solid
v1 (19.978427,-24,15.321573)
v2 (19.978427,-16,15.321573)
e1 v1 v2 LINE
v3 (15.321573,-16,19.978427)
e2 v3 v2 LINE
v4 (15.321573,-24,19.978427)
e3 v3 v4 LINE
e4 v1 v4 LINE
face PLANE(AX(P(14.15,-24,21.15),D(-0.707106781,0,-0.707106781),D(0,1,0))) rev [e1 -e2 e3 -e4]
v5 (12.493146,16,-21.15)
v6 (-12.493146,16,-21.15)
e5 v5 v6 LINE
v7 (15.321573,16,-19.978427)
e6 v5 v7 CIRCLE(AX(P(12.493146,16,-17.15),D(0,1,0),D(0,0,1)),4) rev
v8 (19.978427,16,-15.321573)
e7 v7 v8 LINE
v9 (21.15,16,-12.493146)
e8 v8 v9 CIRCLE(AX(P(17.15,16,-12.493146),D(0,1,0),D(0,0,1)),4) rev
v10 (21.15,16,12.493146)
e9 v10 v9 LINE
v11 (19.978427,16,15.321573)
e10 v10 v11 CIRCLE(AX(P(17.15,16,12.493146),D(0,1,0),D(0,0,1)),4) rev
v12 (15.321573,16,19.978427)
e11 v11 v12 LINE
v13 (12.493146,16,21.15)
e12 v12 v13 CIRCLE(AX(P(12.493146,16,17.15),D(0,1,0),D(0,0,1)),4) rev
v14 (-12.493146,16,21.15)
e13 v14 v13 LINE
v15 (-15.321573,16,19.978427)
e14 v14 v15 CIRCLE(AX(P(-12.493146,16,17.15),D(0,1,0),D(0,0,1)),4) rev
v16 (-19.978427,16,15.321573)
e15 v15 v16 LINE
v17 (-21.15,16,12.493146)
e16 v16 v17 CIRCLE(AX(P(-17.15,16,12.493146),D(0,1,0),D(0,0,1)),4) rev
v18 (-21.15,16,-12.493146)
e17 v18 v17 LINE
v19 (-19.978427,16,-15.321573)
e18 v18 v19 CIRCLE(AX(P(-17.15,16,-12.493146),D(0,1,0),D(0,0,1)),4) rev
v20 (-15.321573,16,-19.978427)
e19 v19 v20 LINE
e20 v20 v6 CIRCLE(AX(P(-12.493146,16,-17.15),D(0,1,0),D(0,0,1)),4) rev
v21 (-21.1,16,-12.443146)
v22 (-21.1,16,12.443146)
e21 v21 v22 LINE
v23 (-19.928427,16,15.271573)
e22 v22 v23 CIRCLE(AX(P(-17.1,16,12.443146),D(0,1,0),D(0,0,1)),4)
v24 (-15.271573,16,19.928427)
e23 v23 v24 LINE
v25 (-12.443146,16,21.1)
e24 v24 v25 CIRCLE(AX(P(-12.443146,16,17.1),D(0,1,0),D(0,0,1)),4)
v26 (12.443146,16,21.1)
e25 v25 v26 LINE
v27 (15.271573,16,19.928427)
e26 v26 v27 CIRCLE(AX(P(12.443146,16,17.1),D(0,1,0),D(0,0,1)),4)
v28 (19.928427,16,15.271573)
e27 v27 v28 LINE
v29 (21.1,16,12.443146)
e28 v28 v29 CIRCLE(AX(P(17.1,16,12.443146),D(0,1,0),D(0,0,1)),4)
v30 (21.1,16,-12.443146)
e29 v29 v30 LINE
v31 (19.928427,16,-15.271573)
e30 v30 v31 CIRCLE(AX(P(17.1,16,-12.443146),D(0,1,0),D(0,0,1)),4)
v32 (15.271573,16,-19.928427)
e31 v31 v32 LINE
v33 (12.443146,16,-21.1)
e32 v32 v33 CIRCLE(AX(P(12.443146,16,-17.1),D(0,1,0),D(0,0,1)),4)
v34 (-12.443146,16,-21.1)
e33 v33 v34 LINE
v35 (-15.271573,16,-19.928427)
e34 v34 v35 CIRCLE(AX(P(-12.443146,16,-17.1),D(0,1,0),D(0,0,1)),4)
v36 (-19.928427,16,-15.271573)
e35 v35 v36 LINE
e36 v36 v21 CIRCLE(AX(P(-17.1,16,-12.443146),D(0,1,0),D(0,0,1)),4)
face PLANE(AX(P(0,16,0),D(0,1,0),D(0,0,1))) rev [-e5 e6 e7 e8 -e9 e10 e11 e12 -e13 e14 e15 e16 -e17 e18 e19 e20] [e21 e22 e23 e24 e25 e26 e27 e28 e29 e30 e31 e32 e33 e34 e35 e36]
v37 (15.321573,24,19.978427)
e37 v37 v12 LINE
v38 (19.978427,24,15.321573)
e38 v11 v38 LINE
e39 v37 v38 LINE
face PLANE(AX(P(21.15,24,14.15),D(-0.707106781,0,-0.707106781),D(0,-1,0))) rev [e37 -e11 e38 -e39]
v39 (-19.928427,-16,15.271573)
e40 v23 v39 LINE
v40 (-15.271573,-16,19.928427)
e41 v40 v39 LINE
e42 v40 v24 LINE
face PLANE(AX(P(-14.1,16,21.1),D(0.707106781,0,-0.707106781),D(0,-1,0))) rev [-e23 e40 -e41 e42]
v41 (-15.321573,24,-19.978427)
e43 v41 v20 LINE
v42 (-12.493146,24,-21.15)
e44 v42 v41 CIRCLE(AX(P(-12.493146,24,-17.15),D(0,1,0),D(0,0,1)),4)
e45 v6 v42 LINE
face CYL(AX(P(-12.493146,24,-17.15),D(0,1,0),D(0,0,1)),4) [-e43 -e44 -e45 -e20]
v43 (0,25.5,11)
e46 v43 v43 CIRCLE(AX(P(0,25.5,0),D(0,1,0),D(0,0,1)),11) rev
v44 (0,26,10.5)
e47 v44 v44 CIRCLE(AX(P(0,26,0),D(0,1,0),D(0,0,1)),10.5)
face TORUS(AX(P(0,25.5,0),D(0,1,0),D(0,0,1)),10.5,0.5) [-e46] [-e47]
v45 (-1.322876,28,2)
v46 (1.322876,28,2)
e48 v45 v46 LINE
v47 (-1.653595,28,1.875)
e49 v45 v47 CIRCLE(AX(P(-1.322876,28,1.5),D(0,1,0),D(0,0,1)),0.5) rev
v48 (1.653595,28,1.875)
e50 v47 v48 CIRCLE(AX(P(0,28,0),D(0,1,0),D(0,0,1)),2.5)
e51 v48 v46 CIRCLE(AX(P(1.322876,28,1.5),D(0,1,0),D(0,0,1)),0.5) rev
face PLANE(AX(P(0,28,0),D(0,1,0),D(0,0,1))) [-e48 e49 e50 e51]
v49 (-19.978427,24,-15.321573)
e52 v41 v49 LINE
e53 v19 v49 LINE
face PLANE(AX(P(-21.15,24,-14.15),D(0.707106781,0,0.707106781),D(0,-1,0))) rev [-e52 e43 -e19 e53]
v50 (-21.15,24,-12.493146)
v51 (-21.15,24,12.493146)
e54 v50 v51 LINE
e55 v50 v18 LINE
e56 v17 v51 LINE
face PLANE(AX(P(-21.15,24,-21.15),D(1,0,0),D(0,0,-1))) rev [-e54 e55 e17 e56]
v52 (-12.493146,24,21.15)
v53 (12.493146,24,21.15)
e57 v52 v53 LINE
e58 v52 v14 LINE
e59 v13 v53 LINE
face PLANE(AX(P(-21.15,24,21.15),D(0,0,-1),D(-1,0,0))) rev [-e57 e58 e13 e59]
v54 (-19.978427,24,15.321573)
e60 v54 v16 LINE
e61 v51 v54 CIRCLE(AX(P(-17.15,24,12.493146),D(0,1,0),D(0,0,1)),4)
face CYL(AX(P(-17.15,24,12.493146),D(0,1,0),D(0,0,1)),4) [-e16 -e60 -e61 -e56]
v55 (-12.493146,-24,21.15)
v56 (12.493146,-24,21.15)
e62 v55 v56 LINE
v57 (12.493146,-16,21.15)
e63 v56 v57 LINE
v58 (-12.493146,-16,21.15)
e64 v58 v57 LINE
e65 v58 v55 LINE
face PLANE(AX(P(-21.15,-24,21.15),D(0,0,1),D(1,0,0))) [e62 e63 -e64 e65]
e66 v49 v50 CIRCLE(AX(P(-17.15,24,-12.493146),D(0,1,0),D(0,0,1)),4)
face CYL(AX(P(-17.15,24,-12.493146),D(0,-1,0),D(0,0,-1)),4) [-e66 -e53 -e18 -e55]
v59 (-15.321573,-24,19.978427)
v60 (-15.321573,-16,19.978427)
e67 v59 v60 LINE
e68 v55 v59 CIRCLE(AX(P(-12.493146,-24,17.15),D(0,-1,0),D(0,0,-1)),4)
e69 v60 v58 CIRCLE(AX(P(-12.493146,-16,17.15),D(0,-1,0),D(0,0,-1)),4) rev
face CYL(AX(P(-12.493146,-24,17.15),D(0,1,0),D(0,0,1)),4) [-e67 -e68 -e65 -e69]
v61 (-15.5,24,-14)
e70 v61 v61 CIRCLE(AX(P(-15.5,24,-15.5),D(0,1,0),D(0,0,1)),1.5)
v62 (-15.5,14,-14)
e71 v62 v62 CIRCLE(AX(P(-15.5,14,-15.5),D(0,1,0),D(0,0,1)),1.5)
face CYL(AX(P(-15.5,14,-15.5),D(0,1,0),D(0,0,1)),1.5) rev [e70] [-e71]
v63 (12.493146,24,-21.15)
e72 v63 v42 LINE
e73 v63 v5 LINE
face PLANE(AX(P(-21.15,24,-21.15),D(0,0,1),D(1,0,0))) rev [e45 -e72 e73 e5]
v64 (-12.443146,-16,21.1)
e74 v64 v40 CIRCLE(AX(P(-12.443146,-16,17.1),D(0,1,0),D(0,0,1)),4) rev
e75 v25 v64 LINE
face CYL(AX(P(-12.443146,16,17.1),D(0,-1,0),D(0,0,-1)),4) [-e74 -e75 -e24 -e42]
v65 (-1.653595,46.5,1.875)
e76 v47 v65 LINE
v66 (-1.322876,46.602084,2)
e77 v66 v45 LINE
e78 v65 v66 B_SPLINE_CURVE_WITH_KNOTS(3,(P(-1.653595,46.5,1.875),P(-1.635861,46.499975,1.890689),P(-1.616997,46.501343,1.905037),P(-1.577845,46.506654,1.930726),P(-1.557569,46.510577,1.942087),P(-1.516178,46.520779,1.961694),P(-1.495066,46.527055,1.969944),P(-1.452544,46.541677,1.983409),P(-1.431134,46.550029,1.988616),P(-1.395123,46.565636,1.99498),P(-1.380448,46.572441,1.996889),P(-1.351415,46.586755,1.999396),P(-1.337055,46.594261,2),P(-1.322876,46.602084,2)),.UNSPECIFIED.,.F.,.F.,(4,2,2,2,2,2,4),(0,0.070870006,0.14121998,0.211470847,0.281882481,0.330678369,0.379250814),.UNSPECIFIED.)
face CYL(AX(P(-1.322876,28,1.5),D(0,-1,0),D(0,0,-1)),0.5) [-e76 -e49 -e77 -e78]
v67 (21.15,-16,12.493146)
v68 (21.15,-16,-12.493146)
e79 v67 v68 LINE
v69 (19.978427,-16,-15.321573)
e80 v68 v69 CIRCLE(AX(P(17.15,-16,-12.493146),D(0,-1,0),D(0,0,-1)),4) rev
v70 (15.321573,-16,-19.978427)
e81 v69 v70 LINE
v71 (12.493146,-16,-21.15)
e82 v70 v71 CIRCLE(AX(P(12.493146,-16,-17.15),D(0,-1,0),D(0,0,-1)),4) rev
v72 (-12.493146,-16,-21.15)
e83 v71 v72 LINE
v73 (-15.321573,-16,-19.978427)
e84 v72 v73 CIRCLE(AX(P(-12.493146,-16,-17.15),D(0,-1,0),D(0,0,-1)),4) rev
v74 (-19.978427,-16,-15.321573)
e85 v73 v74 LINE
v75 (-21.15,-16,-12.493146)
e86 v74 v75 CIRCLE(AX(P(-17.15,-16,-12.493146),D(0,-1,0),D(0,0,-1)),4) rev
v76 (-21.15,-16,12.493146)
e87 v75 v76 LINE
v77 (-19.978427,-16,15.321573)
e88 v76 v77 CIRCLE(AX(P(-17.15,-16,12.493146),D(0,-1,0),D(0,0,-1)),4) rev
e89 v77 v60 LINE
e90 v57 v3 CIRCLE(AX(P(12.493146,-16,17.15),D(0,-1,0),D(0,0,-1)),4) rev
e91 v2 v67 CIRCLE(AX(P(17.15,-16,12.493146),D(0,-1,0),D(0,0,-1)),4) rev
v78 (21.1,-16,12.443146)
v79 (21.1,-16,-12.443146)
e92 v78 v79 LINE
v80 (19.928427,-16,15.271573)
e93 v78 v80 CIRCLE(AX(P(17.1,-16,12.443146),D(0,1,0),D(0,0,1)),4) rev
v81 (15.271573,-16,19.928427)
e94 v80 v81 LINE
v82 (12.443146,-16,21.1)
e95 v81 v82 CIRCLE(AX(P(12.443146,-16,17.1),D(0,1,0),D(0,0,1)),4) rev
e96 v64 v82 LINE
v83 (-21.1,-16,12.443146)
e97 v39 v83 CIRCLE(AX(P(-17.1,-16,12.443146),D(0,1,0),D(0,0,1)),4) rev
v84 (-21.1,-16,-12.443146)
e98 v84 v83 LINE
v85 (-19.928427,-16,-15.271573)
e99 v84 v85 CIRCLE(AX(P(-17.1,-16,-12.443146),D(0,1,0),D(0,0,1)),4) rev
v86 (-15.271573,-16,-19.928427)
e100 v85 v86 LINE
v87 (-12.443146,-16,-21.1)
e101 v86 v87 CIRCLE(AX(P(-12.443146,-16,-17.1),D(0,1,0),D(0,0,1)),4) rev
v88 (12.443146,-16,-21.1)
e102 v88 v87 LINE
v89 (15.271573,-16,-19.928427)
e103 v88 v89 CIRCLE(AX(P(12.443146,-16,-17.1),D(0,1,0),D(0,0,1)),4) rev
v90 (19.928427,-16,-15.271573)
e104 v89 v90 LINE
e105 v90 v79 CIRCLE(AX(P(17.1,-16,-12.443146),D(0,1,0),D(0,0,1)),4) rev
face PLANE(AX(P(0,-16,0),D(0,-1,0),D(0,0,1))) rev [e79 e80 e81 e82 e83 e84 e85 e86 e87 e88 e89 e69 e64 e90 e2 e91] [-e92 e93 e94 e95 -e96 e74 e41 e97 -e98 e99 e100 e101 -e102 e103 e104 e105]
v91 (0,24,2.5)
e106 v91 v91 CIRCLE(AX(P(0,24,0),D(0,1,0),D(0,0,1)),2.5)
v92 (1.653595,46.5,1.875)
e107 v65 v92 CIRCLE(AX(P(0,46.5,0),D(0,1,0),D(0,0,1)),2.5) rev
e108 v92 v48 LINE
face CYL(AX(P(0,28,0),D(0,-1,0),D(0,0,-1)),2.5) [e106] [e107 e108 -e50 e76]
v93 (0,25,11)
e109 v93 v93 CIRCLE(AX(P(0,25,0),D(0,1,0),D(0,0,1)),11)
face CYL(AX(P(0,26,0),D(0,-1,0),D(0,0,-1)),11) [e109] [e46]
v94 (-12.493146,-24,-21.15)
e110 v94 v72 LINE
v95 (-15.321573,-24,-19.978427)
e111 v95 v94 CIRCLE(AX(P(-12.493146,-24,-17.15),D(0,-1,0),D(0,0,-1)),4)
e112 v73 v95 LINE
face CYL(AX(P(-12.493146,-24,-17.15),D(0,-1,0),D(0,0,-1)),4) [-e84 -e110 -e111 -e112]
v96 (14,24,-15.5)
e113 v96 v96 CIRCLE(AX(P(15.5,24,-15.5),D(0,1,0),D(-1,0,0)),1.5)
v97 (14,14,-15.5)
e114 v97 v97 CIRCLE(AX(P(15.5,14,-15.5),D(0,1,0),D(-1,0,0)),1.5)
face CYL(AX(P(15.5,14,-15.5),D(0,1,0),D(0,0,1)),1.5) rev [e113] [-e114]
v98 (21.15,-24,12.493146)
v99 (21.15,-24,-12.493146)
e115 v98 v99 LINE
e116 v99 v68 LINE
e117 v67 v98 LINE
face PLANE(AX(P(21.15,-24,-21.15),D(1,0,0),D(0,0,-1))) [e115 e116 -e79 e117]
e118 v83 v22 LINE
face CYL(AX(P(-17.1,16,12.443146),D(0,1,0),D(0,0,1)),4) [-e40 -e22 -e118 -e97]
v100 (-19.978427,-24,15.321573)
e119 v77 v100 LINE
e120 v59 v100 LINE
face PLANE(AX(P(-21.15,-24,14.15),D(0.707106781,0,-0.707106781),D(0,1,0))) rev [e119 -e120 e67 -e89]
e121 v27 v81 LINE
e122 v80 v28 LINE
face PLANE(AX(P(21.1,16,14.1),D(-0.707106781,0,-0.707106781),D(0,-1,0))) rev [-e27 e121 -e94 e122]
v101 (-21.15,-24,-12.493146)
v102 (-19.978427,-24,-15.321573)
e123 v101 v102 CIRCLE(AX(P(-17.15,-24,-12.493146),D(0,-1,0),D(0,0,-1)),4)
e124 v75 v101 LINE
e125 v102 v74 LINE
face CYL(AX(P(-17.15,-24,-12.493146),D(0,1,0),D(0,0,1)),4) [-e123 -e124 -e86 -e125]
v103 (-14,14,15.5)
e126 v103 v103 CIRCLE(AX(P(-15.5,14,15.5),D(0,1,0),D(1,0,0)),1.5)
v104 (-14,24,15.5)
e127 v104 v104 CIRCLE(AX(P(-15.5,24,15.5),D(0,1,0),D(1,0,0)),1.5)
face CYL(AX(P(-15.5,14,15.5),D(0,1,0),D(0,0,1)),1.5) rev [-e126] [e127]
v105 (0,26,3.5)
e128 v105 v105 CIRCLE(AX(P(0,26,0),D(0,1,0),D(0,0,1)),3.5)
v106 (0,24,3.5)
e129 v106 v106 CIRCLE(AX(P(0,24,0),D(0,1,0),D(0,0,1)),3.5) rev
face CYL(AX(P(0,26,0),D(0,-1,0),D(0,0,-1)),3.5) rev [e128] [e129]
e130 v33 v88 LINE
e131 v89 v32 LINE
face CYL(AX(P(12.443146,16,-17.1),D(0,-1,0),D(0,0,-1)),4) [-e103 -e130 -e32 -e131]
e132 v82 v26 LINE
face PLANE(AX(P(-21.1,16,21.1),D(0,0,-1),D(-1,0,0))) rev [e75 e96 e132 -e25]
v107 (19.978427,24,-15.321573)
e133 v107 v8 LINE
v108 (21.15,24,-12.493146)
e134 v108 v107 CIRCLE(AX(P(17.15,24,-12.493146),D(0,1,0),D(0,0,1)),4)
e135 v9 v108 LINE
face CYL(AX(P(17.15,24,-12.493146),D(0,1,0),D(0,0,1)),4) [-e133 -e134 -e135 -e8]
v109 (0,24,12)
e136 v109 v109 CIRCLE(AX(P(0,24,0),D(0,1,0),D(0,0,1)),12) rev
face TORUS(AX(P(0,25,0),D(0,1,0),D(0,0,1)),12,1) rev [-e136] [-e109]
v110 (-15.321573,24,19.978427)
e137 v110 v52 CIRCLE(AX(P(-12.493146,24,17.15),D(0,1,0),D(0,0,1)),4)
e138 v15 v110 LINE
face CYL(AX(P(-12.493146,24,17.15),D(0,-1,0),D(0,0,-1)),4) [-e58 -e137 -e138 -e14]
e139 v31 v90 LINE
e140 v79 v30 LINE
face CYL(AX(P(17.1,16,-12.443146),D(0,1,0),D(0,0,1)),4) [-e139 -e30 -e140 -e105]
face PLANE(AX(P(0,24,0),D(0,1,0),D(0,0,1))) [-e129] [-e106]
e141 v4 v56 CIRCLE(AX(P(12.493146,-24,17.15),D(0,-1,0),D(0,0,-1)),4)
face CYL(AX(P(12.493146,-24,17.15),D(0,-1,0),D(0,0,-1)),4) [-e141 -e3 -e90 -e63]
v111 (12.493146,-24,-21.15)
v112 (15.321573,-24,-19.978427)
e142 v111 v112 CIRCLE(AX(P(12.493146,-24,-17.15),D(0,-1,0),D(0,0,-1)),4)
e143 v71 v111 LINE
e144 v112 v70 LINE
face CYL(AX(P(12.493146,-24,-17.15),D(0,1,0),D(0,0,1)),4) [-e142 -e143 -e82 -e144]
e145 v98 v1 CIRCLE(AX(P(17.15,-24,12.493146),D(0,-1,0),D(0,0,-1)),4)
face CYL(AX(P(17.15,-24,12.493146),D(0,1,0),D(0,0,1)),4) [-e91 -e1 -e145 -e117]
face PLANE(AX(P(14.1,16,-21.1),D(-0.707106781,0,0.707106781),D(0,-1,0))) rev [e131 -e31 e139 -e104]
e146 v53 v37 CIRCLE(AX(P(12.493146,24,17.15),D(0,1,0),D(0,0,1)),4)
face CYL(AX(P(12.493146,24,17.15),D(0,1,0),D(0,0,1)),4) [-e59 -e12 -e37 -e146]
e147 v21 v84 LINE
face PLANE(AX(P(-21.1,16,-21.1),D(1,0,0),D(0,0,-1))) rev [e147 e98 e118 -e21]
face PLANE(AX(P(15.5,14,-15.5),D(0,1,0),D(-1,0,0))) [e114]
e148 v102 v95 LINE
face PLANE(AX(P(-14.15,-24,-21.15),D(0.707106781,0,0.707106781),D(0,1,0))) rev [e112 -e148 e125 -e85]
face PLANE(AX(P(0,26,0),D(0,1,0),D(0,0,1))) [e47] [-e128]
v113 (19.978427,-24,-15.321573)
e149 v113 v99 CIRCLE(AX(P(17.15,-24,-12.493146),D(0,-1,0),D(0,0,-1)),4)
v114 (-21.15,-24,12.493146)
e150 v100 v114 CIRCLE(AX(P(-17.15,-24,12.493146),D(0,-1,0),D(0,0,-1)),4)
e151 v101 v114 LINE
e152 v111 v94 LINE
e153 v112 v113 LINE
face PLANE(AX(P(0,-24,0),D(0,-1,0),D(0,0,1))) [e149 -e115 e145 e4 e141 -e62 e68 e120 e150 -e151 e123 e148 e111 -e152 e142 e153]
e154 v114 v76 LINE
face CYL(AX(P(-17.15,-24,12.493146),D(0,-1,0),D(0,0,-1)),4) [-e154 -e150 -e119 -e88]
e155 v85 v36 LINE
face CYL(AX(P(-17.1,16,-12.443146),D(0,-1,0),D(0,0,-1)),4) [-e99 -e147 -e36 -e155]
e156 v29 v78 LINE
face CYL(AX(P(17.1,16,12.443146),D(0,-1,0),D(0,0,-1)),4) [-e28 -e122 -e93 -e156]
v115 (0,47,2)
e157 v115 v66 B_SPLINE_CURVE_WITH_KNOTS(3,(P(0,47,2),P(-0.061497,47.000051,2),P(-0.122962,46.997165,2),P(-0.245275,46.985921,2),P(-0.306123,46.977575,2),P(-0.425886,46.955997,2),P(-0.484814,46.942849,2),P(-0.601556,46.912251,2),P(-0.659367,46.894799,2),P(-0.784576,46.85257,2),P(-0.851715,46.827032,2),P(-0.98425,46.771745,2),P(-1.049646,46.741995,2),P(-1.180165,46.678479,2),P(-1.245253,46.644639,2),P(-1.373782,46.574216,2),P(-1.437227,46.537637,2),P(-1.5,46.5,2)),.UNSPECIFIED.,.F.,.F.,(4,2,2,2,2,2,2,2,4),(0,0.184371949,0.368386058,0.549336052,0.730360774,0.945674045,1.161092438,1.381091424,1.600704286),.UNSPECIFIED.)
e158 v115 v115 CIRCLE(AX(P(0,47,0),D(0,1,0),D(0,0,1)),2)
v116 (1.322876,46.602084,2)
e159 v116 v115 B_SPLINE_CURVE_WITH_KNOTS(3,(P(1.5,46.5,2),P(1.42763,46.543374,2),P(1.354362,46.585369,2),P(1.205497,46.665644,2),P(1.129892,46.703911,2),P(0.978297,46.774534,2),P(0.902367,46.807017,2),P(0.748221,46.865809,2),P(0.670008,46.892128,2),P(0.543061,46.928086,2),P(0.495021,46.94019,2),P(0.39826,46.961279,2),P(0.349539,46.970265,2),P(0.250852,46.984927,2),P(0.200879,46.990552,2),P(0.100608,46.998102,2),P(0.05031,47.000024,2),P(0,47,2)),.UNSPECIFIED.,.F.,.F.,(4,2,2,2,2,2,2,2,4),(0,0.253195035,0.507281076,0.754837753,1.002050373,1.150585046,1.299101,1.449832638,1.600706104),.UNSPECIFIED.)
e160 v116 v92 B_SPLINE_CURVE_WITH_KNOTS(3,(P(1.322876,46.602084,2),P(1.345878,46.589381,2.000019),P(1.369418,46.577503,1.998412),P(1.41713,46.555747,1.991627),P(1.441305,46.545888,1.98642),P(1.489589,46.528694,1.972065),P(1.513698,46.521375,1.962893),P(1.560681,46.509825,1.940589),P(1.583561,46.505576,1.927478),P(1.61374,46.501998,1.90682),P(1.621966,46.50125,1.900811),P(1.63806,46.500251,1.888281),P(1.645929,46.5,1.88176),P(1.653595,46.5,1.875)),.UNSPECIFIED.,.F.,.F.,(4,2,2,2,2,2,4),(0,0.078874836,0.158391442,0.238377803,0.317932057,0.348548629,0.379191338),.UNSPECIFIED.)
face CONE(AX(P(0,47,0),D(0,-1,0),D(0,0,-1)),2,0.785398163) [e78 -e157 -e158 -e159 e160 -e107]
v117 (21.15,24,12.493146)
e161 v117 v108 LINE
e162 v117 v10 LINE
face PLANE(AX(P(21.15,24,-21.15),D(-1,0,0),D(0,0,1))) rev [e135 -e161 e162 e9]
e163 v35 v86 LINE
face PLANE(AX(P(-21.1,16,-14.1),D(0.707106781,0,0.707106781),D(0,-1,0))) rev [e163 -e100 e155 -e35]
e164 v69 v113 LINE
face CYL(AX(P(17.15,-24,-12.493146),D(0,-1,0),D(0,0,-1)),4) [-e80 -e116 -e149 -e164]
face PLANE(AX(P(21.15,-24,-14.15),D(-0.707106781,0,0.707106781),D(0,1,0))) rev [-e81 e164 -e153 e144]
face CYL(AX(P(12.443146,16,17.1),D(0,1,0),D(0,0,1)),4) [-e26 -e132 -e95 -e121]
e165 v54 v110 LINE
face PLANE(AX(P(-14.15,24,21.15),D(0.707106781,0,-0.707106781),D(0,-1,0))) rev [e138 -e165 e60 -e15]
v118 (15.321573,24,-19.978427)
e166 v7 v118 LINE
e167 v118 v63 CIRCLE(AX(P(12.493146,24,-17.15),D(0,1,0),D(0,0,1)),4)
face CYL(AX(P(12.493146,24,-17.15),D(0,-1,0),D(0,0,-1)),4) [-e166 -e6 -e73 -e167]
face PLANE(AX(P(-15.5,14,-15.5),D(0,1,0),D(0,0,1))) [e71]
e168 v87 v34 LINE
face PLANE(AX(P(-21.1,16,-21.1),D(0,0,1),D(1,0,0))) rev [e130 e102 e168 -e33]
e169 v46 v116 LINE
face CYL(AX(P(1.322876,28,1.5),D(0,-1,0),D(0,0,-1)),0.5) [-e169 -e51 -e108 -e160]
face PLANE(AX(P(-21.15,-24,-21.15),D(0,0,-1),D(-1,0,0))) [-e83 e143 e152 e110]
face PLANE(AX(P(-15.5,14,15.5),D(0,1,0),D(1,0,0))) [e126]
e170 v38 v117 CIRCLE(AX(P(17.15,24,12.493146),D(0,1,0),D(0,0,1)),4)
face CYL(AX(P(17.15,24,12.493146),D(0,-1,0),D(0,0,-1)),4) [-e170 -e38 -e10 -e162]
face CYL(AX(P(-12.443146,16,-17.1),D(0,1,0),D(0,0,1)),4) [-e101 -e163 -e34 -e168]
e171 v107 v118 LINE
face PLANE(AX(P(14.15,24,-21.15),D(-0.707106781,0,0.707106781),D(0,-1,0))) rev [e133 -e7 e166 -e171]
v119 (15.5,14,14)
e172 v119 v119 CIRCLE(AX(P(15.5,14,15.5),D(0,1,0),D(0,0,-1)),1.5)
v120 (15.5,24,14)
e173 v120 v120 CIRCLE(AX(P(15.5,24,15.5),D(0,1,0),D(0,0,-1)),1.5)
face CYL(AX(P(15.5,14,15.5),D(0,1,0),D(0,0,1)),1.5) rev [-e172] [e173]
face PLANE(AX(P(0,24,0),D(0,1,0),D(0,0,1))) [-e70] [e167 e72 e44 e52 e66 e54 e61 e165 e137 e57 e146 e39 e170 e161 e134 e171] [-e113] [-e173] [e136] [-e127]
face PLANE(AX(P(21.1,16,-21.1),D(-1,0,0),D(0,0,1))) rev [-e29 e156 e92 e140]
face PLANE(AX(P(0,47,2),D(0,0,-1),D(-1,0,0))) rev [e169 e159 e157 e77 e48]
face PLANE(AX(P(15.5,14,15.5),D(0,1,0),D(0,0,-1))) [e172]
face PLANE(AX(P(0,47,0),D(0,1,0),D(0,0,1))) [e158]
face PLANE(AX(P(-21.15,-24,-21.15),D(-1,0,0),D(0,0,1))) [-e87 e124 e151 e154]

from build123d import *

# Parameters (mm, degrees)
ESBO_O1_W                  = 42.2
ESBO_O1_H                  = 42.2
RESSALTO_EXTRUS_O1_DEPTH   = 16
CHANFRO4_SIZE              = 7
FILETE3_R                  = 4
ESBO_O2_W                  = 42.3
ESBO_O2_H                  = 42.3
RESSALTO_EXTRUS_O2_DEPTH   = 8
CHANFRO5_SIZE              = 7
FILETE4_R                  = 4
CHANFRO5_OF_ESPELHAR1_SIZE = 7
FILETE4_OF_ESPELHAR1_R     = 4
ESBO_O3_R                  = 11
ESBO_O3_R_2                = 3.5
RESSALTO_EXTRUS_O3_DEPTH   = 2
FILETE5_R                  = 0.5
FILETE6_R                  = 1
ESBO_O4_R                  = 1.5
CORTE_EXTRUS_O1_DEPTH      = 10
PADR_OCIRCULAR1_COUNT      = 4
ESBO_O5_R                  = 2.5
RESSALTO_EXTRUS_O4_DEPTH   = 4
RESSALTO_EXTRUS_O5_DEPTH   = 19
CHANFRO3_SIZE              = 0.5
FILETE2_R                  = 0.5


with BuildPart() as part:
    # Esboço1 → Ressalto-extrusão1 (new, symmetric)
    with BuildSketch(Plane(origin=(0, 0, 0), x_dir=(1, 0, 0), z_dir=(0, 1, 0))):
        Rectangle(ESBO_O1_W, ESBO_O1_H)
    extrude(amount=RESSALTO_EXTRUS_O1_DEPTH, both=True)

    # Chanfro4
    chanfro4_edges = [part.edges().sort_by_distance(p)[0] for p in [
        (21.1, 0, 21.1),
        (-21.1, 0, 21.1),
        (-21.1, 0, -21.1),
        (21.1, 0, -21.1),
    ]]
    chamfer(chanfro4_edges, length=CHANFRO4_SIZE)

    # Filete3
    filete3_edges = [part.edges().sort_by_distance(p)[0] for p in [
        (14.1, 0, 21.1),
        (-14.1, 0, 21.1),
        (-21.1, 0, -14.1),
        (-21.1, 0, 14.1),
        (14.1, 0, -21.1),
        (-14.1, 0, -21.1),
        (21.1, 0, 14.1),
        (21.1, 0, -14.1),
    ]]
    fillet(filete3_edges, radius=FILETE3_R)

    # Esboço2 → Ressalto-extrusão2 (add)
    with BuildSketch(Plane(origin=(0, 16, 0), x_dir=(1, 0, 0), z_dir=(0, 1, 0))):
        Rectangle(ESBO_O2_W, ESBO_O2_H)
    ressalto_extrus_o2 = extrude(amount=RESSALTO_EXTRUS_O2_DEPTH)

    # Chanfro5
    chanfro5_edges = [part.edges().sort_by_distance(p)[0] for p in [
        (21.15, 20, 21.15),
        (21.15, 20, -21.15),
        (-21.15, 20, -21.15),
        (-21.15, 20, 21.15),
    ]]
    chamfer(chanfro5_edges, length=CHANFRO5_SIZE)

    # Filete4
    filete4_edges = [part.edges().sort_by_distance(p)[0] for p in [
        (-14.15, 20, -21.15),
        (14.15, 20, -21.15),
        (21.15, 20, 14.15),
        (21.15, 20, -14.15),
        (-14.15, 20, 21.15),
        (14.15, 20, 21.15),
        (-21.15, 20, -14.15),
        (-21.15, 20, 14.15),
    ]]
    fillet(filete4_edges, radius=FILETE4_R)

    # Espelhar1: Ressalto-extrusão2 across plane
    add(ressalto_extrus_o2.mirror(Plane.ZX))

    # Chanfro5 of Espelhar1
    chanfro5_of_espelhar1_edges = [part.edges().sort_by_distance(p)[0] for p in [
        (21.15, -20, 21.15),
        (21.15, -20, -21.15),
        (-21.15, -20, -21.15),
        (-21.15, -20, 21.15),
    ]]
    chamfer(chanfro5_of_espelhar1_edges, length=CHANFRO5_OF_ESPELHAR1_SIZE)

    # Filete4 of Espelhar1
    filete4_of_espelhar1_edges = [part.edges().sort_by_distance(p)[0] for p in [
        (-14.15, -20, -21.15),
        (14.15, -20, -21.15),
        (21.15, -20, 14.15),
        (21.15, -20, -14.15),
        (-14.15, -20, 21.15),
        (14.15, -20, 21.15),
        (-21.15, -20, -14.15),
        (-21.15, -20, 14.15),
    ]]
    fillet(filete4_of_espelhar1_edges, radius=FILETE4_OF_ESPELHAR1_R)

    # Esboço3 → Ressalto-extrusão3 (add)
    with BuildSketch(Plane(origin=(0, 24, 0), x_dir=(1, 0, 0), z_dir=(0, 1, 0))):
        with Locations(Location((0, 0, 0), (0, 0, 270))):
            Circle(ESBO_O3_R)
        with Locations(Location((0, 0, 0), (0, 0, 270))):
            Circle(ESBO_O3_R_2, mode=Mode.SUBTRACT)
    extrude(amount=RESSALTO_EXTRUS_O3_DEPTH)

    # Filete5
    filete5_edges = [part.edges().sort_by_distance(p)[0] for p in [
        (0, 26, -11),
    ]]
    fillet(filete5_edges, radius=FILETE5_R)

    # Filete6
    filete6_edges = [part.edges().sort_by_distance(p)[0] for p in [
        (0, 24, -11),
    ]]
    fillet(filete6_edges, radius=FILETE6_R)

    # Esboço4 → Corte-extrusão1 (cut)
    with BuildSketch(Plane(origin=(0, 24, 0), x_dir=(1, 0, 0), z_dir=(0, 1, 0))):
        with Locations(Location((-15.5, 15.5, 0), (0, 0, 270))):
            Circle(ESBO_O4_R)
    corte_extrus_o1 = extrude(amount=-CORTE_EXTRUS_O1_DEPTH, mode=Mode.SUBTRACT)

    # PadrãoCircular1: Corte-extrusão1 ×4 about axis
    padr_ocircular1_axis = Axis((0, 0, 0), (0, 1, 0))
    for i in range(1, PADR_OCIRCULAR1_COUNT):
        add(corte_extrus_o1.rotate(padr_ocircular1_axis, i * 360 / PADR_OCIRCULAR1_COUNT), mode=Mode.SUBTRACT)

    # Esboço5 → Ressalto-extrusão4 (add)
    with BuildSketch(Plane(origin=(0, 24, 0), x_dir=(1, 0, 0), z_dir=(0, 1, 0))):
        with Locations(Location((0, 0, 0), (0, 0, 270))):
            Circle(ESBO_O5_R)
    extrude(amount=RESSALTO_EXTRUS_O4_DEPTH)

    # Esboço6 → Ressalto-extrusão5 (add)
    with BuildSketch(Plane(origin=(0, 28, 0), x_dir=(1, 0, 0), z_dir=(0, 1, 0))):
        with BuildLine():
            ThreePointArc((2.5, 0), (-1.118033989, 2.236067977), (-1.5, -2))
            Line((-1.5, -2), (1.5, -2))
            ThreePointArc((1.5, -2), (2.236067977, -1.118033989), (2.5, 0))
        make_face()
    extrude(amount=RESSALTO_EXTRUS_O5_DEPTH)

    # Chanfro3
    chanfro3_edges = [part.edges().sort_by_distance(p)[0] for p in [
        (0, 47, -2.5),
    ]]
    chamfer(chanfro3_edges, length=CHANFRO3_SIZE - 0.0001)  # a hair under: the kernel refuses the full size

    # Filete2
    filete2_edges = [part.edges().sort_by_distance(p)[0] for p in [
        (-1.5, 37.25005, 2),
        (1.5, 37.25005, 2),
    ]]
    fillet(filete2_edges, radius=FILETE2_R)


solid = part.part
